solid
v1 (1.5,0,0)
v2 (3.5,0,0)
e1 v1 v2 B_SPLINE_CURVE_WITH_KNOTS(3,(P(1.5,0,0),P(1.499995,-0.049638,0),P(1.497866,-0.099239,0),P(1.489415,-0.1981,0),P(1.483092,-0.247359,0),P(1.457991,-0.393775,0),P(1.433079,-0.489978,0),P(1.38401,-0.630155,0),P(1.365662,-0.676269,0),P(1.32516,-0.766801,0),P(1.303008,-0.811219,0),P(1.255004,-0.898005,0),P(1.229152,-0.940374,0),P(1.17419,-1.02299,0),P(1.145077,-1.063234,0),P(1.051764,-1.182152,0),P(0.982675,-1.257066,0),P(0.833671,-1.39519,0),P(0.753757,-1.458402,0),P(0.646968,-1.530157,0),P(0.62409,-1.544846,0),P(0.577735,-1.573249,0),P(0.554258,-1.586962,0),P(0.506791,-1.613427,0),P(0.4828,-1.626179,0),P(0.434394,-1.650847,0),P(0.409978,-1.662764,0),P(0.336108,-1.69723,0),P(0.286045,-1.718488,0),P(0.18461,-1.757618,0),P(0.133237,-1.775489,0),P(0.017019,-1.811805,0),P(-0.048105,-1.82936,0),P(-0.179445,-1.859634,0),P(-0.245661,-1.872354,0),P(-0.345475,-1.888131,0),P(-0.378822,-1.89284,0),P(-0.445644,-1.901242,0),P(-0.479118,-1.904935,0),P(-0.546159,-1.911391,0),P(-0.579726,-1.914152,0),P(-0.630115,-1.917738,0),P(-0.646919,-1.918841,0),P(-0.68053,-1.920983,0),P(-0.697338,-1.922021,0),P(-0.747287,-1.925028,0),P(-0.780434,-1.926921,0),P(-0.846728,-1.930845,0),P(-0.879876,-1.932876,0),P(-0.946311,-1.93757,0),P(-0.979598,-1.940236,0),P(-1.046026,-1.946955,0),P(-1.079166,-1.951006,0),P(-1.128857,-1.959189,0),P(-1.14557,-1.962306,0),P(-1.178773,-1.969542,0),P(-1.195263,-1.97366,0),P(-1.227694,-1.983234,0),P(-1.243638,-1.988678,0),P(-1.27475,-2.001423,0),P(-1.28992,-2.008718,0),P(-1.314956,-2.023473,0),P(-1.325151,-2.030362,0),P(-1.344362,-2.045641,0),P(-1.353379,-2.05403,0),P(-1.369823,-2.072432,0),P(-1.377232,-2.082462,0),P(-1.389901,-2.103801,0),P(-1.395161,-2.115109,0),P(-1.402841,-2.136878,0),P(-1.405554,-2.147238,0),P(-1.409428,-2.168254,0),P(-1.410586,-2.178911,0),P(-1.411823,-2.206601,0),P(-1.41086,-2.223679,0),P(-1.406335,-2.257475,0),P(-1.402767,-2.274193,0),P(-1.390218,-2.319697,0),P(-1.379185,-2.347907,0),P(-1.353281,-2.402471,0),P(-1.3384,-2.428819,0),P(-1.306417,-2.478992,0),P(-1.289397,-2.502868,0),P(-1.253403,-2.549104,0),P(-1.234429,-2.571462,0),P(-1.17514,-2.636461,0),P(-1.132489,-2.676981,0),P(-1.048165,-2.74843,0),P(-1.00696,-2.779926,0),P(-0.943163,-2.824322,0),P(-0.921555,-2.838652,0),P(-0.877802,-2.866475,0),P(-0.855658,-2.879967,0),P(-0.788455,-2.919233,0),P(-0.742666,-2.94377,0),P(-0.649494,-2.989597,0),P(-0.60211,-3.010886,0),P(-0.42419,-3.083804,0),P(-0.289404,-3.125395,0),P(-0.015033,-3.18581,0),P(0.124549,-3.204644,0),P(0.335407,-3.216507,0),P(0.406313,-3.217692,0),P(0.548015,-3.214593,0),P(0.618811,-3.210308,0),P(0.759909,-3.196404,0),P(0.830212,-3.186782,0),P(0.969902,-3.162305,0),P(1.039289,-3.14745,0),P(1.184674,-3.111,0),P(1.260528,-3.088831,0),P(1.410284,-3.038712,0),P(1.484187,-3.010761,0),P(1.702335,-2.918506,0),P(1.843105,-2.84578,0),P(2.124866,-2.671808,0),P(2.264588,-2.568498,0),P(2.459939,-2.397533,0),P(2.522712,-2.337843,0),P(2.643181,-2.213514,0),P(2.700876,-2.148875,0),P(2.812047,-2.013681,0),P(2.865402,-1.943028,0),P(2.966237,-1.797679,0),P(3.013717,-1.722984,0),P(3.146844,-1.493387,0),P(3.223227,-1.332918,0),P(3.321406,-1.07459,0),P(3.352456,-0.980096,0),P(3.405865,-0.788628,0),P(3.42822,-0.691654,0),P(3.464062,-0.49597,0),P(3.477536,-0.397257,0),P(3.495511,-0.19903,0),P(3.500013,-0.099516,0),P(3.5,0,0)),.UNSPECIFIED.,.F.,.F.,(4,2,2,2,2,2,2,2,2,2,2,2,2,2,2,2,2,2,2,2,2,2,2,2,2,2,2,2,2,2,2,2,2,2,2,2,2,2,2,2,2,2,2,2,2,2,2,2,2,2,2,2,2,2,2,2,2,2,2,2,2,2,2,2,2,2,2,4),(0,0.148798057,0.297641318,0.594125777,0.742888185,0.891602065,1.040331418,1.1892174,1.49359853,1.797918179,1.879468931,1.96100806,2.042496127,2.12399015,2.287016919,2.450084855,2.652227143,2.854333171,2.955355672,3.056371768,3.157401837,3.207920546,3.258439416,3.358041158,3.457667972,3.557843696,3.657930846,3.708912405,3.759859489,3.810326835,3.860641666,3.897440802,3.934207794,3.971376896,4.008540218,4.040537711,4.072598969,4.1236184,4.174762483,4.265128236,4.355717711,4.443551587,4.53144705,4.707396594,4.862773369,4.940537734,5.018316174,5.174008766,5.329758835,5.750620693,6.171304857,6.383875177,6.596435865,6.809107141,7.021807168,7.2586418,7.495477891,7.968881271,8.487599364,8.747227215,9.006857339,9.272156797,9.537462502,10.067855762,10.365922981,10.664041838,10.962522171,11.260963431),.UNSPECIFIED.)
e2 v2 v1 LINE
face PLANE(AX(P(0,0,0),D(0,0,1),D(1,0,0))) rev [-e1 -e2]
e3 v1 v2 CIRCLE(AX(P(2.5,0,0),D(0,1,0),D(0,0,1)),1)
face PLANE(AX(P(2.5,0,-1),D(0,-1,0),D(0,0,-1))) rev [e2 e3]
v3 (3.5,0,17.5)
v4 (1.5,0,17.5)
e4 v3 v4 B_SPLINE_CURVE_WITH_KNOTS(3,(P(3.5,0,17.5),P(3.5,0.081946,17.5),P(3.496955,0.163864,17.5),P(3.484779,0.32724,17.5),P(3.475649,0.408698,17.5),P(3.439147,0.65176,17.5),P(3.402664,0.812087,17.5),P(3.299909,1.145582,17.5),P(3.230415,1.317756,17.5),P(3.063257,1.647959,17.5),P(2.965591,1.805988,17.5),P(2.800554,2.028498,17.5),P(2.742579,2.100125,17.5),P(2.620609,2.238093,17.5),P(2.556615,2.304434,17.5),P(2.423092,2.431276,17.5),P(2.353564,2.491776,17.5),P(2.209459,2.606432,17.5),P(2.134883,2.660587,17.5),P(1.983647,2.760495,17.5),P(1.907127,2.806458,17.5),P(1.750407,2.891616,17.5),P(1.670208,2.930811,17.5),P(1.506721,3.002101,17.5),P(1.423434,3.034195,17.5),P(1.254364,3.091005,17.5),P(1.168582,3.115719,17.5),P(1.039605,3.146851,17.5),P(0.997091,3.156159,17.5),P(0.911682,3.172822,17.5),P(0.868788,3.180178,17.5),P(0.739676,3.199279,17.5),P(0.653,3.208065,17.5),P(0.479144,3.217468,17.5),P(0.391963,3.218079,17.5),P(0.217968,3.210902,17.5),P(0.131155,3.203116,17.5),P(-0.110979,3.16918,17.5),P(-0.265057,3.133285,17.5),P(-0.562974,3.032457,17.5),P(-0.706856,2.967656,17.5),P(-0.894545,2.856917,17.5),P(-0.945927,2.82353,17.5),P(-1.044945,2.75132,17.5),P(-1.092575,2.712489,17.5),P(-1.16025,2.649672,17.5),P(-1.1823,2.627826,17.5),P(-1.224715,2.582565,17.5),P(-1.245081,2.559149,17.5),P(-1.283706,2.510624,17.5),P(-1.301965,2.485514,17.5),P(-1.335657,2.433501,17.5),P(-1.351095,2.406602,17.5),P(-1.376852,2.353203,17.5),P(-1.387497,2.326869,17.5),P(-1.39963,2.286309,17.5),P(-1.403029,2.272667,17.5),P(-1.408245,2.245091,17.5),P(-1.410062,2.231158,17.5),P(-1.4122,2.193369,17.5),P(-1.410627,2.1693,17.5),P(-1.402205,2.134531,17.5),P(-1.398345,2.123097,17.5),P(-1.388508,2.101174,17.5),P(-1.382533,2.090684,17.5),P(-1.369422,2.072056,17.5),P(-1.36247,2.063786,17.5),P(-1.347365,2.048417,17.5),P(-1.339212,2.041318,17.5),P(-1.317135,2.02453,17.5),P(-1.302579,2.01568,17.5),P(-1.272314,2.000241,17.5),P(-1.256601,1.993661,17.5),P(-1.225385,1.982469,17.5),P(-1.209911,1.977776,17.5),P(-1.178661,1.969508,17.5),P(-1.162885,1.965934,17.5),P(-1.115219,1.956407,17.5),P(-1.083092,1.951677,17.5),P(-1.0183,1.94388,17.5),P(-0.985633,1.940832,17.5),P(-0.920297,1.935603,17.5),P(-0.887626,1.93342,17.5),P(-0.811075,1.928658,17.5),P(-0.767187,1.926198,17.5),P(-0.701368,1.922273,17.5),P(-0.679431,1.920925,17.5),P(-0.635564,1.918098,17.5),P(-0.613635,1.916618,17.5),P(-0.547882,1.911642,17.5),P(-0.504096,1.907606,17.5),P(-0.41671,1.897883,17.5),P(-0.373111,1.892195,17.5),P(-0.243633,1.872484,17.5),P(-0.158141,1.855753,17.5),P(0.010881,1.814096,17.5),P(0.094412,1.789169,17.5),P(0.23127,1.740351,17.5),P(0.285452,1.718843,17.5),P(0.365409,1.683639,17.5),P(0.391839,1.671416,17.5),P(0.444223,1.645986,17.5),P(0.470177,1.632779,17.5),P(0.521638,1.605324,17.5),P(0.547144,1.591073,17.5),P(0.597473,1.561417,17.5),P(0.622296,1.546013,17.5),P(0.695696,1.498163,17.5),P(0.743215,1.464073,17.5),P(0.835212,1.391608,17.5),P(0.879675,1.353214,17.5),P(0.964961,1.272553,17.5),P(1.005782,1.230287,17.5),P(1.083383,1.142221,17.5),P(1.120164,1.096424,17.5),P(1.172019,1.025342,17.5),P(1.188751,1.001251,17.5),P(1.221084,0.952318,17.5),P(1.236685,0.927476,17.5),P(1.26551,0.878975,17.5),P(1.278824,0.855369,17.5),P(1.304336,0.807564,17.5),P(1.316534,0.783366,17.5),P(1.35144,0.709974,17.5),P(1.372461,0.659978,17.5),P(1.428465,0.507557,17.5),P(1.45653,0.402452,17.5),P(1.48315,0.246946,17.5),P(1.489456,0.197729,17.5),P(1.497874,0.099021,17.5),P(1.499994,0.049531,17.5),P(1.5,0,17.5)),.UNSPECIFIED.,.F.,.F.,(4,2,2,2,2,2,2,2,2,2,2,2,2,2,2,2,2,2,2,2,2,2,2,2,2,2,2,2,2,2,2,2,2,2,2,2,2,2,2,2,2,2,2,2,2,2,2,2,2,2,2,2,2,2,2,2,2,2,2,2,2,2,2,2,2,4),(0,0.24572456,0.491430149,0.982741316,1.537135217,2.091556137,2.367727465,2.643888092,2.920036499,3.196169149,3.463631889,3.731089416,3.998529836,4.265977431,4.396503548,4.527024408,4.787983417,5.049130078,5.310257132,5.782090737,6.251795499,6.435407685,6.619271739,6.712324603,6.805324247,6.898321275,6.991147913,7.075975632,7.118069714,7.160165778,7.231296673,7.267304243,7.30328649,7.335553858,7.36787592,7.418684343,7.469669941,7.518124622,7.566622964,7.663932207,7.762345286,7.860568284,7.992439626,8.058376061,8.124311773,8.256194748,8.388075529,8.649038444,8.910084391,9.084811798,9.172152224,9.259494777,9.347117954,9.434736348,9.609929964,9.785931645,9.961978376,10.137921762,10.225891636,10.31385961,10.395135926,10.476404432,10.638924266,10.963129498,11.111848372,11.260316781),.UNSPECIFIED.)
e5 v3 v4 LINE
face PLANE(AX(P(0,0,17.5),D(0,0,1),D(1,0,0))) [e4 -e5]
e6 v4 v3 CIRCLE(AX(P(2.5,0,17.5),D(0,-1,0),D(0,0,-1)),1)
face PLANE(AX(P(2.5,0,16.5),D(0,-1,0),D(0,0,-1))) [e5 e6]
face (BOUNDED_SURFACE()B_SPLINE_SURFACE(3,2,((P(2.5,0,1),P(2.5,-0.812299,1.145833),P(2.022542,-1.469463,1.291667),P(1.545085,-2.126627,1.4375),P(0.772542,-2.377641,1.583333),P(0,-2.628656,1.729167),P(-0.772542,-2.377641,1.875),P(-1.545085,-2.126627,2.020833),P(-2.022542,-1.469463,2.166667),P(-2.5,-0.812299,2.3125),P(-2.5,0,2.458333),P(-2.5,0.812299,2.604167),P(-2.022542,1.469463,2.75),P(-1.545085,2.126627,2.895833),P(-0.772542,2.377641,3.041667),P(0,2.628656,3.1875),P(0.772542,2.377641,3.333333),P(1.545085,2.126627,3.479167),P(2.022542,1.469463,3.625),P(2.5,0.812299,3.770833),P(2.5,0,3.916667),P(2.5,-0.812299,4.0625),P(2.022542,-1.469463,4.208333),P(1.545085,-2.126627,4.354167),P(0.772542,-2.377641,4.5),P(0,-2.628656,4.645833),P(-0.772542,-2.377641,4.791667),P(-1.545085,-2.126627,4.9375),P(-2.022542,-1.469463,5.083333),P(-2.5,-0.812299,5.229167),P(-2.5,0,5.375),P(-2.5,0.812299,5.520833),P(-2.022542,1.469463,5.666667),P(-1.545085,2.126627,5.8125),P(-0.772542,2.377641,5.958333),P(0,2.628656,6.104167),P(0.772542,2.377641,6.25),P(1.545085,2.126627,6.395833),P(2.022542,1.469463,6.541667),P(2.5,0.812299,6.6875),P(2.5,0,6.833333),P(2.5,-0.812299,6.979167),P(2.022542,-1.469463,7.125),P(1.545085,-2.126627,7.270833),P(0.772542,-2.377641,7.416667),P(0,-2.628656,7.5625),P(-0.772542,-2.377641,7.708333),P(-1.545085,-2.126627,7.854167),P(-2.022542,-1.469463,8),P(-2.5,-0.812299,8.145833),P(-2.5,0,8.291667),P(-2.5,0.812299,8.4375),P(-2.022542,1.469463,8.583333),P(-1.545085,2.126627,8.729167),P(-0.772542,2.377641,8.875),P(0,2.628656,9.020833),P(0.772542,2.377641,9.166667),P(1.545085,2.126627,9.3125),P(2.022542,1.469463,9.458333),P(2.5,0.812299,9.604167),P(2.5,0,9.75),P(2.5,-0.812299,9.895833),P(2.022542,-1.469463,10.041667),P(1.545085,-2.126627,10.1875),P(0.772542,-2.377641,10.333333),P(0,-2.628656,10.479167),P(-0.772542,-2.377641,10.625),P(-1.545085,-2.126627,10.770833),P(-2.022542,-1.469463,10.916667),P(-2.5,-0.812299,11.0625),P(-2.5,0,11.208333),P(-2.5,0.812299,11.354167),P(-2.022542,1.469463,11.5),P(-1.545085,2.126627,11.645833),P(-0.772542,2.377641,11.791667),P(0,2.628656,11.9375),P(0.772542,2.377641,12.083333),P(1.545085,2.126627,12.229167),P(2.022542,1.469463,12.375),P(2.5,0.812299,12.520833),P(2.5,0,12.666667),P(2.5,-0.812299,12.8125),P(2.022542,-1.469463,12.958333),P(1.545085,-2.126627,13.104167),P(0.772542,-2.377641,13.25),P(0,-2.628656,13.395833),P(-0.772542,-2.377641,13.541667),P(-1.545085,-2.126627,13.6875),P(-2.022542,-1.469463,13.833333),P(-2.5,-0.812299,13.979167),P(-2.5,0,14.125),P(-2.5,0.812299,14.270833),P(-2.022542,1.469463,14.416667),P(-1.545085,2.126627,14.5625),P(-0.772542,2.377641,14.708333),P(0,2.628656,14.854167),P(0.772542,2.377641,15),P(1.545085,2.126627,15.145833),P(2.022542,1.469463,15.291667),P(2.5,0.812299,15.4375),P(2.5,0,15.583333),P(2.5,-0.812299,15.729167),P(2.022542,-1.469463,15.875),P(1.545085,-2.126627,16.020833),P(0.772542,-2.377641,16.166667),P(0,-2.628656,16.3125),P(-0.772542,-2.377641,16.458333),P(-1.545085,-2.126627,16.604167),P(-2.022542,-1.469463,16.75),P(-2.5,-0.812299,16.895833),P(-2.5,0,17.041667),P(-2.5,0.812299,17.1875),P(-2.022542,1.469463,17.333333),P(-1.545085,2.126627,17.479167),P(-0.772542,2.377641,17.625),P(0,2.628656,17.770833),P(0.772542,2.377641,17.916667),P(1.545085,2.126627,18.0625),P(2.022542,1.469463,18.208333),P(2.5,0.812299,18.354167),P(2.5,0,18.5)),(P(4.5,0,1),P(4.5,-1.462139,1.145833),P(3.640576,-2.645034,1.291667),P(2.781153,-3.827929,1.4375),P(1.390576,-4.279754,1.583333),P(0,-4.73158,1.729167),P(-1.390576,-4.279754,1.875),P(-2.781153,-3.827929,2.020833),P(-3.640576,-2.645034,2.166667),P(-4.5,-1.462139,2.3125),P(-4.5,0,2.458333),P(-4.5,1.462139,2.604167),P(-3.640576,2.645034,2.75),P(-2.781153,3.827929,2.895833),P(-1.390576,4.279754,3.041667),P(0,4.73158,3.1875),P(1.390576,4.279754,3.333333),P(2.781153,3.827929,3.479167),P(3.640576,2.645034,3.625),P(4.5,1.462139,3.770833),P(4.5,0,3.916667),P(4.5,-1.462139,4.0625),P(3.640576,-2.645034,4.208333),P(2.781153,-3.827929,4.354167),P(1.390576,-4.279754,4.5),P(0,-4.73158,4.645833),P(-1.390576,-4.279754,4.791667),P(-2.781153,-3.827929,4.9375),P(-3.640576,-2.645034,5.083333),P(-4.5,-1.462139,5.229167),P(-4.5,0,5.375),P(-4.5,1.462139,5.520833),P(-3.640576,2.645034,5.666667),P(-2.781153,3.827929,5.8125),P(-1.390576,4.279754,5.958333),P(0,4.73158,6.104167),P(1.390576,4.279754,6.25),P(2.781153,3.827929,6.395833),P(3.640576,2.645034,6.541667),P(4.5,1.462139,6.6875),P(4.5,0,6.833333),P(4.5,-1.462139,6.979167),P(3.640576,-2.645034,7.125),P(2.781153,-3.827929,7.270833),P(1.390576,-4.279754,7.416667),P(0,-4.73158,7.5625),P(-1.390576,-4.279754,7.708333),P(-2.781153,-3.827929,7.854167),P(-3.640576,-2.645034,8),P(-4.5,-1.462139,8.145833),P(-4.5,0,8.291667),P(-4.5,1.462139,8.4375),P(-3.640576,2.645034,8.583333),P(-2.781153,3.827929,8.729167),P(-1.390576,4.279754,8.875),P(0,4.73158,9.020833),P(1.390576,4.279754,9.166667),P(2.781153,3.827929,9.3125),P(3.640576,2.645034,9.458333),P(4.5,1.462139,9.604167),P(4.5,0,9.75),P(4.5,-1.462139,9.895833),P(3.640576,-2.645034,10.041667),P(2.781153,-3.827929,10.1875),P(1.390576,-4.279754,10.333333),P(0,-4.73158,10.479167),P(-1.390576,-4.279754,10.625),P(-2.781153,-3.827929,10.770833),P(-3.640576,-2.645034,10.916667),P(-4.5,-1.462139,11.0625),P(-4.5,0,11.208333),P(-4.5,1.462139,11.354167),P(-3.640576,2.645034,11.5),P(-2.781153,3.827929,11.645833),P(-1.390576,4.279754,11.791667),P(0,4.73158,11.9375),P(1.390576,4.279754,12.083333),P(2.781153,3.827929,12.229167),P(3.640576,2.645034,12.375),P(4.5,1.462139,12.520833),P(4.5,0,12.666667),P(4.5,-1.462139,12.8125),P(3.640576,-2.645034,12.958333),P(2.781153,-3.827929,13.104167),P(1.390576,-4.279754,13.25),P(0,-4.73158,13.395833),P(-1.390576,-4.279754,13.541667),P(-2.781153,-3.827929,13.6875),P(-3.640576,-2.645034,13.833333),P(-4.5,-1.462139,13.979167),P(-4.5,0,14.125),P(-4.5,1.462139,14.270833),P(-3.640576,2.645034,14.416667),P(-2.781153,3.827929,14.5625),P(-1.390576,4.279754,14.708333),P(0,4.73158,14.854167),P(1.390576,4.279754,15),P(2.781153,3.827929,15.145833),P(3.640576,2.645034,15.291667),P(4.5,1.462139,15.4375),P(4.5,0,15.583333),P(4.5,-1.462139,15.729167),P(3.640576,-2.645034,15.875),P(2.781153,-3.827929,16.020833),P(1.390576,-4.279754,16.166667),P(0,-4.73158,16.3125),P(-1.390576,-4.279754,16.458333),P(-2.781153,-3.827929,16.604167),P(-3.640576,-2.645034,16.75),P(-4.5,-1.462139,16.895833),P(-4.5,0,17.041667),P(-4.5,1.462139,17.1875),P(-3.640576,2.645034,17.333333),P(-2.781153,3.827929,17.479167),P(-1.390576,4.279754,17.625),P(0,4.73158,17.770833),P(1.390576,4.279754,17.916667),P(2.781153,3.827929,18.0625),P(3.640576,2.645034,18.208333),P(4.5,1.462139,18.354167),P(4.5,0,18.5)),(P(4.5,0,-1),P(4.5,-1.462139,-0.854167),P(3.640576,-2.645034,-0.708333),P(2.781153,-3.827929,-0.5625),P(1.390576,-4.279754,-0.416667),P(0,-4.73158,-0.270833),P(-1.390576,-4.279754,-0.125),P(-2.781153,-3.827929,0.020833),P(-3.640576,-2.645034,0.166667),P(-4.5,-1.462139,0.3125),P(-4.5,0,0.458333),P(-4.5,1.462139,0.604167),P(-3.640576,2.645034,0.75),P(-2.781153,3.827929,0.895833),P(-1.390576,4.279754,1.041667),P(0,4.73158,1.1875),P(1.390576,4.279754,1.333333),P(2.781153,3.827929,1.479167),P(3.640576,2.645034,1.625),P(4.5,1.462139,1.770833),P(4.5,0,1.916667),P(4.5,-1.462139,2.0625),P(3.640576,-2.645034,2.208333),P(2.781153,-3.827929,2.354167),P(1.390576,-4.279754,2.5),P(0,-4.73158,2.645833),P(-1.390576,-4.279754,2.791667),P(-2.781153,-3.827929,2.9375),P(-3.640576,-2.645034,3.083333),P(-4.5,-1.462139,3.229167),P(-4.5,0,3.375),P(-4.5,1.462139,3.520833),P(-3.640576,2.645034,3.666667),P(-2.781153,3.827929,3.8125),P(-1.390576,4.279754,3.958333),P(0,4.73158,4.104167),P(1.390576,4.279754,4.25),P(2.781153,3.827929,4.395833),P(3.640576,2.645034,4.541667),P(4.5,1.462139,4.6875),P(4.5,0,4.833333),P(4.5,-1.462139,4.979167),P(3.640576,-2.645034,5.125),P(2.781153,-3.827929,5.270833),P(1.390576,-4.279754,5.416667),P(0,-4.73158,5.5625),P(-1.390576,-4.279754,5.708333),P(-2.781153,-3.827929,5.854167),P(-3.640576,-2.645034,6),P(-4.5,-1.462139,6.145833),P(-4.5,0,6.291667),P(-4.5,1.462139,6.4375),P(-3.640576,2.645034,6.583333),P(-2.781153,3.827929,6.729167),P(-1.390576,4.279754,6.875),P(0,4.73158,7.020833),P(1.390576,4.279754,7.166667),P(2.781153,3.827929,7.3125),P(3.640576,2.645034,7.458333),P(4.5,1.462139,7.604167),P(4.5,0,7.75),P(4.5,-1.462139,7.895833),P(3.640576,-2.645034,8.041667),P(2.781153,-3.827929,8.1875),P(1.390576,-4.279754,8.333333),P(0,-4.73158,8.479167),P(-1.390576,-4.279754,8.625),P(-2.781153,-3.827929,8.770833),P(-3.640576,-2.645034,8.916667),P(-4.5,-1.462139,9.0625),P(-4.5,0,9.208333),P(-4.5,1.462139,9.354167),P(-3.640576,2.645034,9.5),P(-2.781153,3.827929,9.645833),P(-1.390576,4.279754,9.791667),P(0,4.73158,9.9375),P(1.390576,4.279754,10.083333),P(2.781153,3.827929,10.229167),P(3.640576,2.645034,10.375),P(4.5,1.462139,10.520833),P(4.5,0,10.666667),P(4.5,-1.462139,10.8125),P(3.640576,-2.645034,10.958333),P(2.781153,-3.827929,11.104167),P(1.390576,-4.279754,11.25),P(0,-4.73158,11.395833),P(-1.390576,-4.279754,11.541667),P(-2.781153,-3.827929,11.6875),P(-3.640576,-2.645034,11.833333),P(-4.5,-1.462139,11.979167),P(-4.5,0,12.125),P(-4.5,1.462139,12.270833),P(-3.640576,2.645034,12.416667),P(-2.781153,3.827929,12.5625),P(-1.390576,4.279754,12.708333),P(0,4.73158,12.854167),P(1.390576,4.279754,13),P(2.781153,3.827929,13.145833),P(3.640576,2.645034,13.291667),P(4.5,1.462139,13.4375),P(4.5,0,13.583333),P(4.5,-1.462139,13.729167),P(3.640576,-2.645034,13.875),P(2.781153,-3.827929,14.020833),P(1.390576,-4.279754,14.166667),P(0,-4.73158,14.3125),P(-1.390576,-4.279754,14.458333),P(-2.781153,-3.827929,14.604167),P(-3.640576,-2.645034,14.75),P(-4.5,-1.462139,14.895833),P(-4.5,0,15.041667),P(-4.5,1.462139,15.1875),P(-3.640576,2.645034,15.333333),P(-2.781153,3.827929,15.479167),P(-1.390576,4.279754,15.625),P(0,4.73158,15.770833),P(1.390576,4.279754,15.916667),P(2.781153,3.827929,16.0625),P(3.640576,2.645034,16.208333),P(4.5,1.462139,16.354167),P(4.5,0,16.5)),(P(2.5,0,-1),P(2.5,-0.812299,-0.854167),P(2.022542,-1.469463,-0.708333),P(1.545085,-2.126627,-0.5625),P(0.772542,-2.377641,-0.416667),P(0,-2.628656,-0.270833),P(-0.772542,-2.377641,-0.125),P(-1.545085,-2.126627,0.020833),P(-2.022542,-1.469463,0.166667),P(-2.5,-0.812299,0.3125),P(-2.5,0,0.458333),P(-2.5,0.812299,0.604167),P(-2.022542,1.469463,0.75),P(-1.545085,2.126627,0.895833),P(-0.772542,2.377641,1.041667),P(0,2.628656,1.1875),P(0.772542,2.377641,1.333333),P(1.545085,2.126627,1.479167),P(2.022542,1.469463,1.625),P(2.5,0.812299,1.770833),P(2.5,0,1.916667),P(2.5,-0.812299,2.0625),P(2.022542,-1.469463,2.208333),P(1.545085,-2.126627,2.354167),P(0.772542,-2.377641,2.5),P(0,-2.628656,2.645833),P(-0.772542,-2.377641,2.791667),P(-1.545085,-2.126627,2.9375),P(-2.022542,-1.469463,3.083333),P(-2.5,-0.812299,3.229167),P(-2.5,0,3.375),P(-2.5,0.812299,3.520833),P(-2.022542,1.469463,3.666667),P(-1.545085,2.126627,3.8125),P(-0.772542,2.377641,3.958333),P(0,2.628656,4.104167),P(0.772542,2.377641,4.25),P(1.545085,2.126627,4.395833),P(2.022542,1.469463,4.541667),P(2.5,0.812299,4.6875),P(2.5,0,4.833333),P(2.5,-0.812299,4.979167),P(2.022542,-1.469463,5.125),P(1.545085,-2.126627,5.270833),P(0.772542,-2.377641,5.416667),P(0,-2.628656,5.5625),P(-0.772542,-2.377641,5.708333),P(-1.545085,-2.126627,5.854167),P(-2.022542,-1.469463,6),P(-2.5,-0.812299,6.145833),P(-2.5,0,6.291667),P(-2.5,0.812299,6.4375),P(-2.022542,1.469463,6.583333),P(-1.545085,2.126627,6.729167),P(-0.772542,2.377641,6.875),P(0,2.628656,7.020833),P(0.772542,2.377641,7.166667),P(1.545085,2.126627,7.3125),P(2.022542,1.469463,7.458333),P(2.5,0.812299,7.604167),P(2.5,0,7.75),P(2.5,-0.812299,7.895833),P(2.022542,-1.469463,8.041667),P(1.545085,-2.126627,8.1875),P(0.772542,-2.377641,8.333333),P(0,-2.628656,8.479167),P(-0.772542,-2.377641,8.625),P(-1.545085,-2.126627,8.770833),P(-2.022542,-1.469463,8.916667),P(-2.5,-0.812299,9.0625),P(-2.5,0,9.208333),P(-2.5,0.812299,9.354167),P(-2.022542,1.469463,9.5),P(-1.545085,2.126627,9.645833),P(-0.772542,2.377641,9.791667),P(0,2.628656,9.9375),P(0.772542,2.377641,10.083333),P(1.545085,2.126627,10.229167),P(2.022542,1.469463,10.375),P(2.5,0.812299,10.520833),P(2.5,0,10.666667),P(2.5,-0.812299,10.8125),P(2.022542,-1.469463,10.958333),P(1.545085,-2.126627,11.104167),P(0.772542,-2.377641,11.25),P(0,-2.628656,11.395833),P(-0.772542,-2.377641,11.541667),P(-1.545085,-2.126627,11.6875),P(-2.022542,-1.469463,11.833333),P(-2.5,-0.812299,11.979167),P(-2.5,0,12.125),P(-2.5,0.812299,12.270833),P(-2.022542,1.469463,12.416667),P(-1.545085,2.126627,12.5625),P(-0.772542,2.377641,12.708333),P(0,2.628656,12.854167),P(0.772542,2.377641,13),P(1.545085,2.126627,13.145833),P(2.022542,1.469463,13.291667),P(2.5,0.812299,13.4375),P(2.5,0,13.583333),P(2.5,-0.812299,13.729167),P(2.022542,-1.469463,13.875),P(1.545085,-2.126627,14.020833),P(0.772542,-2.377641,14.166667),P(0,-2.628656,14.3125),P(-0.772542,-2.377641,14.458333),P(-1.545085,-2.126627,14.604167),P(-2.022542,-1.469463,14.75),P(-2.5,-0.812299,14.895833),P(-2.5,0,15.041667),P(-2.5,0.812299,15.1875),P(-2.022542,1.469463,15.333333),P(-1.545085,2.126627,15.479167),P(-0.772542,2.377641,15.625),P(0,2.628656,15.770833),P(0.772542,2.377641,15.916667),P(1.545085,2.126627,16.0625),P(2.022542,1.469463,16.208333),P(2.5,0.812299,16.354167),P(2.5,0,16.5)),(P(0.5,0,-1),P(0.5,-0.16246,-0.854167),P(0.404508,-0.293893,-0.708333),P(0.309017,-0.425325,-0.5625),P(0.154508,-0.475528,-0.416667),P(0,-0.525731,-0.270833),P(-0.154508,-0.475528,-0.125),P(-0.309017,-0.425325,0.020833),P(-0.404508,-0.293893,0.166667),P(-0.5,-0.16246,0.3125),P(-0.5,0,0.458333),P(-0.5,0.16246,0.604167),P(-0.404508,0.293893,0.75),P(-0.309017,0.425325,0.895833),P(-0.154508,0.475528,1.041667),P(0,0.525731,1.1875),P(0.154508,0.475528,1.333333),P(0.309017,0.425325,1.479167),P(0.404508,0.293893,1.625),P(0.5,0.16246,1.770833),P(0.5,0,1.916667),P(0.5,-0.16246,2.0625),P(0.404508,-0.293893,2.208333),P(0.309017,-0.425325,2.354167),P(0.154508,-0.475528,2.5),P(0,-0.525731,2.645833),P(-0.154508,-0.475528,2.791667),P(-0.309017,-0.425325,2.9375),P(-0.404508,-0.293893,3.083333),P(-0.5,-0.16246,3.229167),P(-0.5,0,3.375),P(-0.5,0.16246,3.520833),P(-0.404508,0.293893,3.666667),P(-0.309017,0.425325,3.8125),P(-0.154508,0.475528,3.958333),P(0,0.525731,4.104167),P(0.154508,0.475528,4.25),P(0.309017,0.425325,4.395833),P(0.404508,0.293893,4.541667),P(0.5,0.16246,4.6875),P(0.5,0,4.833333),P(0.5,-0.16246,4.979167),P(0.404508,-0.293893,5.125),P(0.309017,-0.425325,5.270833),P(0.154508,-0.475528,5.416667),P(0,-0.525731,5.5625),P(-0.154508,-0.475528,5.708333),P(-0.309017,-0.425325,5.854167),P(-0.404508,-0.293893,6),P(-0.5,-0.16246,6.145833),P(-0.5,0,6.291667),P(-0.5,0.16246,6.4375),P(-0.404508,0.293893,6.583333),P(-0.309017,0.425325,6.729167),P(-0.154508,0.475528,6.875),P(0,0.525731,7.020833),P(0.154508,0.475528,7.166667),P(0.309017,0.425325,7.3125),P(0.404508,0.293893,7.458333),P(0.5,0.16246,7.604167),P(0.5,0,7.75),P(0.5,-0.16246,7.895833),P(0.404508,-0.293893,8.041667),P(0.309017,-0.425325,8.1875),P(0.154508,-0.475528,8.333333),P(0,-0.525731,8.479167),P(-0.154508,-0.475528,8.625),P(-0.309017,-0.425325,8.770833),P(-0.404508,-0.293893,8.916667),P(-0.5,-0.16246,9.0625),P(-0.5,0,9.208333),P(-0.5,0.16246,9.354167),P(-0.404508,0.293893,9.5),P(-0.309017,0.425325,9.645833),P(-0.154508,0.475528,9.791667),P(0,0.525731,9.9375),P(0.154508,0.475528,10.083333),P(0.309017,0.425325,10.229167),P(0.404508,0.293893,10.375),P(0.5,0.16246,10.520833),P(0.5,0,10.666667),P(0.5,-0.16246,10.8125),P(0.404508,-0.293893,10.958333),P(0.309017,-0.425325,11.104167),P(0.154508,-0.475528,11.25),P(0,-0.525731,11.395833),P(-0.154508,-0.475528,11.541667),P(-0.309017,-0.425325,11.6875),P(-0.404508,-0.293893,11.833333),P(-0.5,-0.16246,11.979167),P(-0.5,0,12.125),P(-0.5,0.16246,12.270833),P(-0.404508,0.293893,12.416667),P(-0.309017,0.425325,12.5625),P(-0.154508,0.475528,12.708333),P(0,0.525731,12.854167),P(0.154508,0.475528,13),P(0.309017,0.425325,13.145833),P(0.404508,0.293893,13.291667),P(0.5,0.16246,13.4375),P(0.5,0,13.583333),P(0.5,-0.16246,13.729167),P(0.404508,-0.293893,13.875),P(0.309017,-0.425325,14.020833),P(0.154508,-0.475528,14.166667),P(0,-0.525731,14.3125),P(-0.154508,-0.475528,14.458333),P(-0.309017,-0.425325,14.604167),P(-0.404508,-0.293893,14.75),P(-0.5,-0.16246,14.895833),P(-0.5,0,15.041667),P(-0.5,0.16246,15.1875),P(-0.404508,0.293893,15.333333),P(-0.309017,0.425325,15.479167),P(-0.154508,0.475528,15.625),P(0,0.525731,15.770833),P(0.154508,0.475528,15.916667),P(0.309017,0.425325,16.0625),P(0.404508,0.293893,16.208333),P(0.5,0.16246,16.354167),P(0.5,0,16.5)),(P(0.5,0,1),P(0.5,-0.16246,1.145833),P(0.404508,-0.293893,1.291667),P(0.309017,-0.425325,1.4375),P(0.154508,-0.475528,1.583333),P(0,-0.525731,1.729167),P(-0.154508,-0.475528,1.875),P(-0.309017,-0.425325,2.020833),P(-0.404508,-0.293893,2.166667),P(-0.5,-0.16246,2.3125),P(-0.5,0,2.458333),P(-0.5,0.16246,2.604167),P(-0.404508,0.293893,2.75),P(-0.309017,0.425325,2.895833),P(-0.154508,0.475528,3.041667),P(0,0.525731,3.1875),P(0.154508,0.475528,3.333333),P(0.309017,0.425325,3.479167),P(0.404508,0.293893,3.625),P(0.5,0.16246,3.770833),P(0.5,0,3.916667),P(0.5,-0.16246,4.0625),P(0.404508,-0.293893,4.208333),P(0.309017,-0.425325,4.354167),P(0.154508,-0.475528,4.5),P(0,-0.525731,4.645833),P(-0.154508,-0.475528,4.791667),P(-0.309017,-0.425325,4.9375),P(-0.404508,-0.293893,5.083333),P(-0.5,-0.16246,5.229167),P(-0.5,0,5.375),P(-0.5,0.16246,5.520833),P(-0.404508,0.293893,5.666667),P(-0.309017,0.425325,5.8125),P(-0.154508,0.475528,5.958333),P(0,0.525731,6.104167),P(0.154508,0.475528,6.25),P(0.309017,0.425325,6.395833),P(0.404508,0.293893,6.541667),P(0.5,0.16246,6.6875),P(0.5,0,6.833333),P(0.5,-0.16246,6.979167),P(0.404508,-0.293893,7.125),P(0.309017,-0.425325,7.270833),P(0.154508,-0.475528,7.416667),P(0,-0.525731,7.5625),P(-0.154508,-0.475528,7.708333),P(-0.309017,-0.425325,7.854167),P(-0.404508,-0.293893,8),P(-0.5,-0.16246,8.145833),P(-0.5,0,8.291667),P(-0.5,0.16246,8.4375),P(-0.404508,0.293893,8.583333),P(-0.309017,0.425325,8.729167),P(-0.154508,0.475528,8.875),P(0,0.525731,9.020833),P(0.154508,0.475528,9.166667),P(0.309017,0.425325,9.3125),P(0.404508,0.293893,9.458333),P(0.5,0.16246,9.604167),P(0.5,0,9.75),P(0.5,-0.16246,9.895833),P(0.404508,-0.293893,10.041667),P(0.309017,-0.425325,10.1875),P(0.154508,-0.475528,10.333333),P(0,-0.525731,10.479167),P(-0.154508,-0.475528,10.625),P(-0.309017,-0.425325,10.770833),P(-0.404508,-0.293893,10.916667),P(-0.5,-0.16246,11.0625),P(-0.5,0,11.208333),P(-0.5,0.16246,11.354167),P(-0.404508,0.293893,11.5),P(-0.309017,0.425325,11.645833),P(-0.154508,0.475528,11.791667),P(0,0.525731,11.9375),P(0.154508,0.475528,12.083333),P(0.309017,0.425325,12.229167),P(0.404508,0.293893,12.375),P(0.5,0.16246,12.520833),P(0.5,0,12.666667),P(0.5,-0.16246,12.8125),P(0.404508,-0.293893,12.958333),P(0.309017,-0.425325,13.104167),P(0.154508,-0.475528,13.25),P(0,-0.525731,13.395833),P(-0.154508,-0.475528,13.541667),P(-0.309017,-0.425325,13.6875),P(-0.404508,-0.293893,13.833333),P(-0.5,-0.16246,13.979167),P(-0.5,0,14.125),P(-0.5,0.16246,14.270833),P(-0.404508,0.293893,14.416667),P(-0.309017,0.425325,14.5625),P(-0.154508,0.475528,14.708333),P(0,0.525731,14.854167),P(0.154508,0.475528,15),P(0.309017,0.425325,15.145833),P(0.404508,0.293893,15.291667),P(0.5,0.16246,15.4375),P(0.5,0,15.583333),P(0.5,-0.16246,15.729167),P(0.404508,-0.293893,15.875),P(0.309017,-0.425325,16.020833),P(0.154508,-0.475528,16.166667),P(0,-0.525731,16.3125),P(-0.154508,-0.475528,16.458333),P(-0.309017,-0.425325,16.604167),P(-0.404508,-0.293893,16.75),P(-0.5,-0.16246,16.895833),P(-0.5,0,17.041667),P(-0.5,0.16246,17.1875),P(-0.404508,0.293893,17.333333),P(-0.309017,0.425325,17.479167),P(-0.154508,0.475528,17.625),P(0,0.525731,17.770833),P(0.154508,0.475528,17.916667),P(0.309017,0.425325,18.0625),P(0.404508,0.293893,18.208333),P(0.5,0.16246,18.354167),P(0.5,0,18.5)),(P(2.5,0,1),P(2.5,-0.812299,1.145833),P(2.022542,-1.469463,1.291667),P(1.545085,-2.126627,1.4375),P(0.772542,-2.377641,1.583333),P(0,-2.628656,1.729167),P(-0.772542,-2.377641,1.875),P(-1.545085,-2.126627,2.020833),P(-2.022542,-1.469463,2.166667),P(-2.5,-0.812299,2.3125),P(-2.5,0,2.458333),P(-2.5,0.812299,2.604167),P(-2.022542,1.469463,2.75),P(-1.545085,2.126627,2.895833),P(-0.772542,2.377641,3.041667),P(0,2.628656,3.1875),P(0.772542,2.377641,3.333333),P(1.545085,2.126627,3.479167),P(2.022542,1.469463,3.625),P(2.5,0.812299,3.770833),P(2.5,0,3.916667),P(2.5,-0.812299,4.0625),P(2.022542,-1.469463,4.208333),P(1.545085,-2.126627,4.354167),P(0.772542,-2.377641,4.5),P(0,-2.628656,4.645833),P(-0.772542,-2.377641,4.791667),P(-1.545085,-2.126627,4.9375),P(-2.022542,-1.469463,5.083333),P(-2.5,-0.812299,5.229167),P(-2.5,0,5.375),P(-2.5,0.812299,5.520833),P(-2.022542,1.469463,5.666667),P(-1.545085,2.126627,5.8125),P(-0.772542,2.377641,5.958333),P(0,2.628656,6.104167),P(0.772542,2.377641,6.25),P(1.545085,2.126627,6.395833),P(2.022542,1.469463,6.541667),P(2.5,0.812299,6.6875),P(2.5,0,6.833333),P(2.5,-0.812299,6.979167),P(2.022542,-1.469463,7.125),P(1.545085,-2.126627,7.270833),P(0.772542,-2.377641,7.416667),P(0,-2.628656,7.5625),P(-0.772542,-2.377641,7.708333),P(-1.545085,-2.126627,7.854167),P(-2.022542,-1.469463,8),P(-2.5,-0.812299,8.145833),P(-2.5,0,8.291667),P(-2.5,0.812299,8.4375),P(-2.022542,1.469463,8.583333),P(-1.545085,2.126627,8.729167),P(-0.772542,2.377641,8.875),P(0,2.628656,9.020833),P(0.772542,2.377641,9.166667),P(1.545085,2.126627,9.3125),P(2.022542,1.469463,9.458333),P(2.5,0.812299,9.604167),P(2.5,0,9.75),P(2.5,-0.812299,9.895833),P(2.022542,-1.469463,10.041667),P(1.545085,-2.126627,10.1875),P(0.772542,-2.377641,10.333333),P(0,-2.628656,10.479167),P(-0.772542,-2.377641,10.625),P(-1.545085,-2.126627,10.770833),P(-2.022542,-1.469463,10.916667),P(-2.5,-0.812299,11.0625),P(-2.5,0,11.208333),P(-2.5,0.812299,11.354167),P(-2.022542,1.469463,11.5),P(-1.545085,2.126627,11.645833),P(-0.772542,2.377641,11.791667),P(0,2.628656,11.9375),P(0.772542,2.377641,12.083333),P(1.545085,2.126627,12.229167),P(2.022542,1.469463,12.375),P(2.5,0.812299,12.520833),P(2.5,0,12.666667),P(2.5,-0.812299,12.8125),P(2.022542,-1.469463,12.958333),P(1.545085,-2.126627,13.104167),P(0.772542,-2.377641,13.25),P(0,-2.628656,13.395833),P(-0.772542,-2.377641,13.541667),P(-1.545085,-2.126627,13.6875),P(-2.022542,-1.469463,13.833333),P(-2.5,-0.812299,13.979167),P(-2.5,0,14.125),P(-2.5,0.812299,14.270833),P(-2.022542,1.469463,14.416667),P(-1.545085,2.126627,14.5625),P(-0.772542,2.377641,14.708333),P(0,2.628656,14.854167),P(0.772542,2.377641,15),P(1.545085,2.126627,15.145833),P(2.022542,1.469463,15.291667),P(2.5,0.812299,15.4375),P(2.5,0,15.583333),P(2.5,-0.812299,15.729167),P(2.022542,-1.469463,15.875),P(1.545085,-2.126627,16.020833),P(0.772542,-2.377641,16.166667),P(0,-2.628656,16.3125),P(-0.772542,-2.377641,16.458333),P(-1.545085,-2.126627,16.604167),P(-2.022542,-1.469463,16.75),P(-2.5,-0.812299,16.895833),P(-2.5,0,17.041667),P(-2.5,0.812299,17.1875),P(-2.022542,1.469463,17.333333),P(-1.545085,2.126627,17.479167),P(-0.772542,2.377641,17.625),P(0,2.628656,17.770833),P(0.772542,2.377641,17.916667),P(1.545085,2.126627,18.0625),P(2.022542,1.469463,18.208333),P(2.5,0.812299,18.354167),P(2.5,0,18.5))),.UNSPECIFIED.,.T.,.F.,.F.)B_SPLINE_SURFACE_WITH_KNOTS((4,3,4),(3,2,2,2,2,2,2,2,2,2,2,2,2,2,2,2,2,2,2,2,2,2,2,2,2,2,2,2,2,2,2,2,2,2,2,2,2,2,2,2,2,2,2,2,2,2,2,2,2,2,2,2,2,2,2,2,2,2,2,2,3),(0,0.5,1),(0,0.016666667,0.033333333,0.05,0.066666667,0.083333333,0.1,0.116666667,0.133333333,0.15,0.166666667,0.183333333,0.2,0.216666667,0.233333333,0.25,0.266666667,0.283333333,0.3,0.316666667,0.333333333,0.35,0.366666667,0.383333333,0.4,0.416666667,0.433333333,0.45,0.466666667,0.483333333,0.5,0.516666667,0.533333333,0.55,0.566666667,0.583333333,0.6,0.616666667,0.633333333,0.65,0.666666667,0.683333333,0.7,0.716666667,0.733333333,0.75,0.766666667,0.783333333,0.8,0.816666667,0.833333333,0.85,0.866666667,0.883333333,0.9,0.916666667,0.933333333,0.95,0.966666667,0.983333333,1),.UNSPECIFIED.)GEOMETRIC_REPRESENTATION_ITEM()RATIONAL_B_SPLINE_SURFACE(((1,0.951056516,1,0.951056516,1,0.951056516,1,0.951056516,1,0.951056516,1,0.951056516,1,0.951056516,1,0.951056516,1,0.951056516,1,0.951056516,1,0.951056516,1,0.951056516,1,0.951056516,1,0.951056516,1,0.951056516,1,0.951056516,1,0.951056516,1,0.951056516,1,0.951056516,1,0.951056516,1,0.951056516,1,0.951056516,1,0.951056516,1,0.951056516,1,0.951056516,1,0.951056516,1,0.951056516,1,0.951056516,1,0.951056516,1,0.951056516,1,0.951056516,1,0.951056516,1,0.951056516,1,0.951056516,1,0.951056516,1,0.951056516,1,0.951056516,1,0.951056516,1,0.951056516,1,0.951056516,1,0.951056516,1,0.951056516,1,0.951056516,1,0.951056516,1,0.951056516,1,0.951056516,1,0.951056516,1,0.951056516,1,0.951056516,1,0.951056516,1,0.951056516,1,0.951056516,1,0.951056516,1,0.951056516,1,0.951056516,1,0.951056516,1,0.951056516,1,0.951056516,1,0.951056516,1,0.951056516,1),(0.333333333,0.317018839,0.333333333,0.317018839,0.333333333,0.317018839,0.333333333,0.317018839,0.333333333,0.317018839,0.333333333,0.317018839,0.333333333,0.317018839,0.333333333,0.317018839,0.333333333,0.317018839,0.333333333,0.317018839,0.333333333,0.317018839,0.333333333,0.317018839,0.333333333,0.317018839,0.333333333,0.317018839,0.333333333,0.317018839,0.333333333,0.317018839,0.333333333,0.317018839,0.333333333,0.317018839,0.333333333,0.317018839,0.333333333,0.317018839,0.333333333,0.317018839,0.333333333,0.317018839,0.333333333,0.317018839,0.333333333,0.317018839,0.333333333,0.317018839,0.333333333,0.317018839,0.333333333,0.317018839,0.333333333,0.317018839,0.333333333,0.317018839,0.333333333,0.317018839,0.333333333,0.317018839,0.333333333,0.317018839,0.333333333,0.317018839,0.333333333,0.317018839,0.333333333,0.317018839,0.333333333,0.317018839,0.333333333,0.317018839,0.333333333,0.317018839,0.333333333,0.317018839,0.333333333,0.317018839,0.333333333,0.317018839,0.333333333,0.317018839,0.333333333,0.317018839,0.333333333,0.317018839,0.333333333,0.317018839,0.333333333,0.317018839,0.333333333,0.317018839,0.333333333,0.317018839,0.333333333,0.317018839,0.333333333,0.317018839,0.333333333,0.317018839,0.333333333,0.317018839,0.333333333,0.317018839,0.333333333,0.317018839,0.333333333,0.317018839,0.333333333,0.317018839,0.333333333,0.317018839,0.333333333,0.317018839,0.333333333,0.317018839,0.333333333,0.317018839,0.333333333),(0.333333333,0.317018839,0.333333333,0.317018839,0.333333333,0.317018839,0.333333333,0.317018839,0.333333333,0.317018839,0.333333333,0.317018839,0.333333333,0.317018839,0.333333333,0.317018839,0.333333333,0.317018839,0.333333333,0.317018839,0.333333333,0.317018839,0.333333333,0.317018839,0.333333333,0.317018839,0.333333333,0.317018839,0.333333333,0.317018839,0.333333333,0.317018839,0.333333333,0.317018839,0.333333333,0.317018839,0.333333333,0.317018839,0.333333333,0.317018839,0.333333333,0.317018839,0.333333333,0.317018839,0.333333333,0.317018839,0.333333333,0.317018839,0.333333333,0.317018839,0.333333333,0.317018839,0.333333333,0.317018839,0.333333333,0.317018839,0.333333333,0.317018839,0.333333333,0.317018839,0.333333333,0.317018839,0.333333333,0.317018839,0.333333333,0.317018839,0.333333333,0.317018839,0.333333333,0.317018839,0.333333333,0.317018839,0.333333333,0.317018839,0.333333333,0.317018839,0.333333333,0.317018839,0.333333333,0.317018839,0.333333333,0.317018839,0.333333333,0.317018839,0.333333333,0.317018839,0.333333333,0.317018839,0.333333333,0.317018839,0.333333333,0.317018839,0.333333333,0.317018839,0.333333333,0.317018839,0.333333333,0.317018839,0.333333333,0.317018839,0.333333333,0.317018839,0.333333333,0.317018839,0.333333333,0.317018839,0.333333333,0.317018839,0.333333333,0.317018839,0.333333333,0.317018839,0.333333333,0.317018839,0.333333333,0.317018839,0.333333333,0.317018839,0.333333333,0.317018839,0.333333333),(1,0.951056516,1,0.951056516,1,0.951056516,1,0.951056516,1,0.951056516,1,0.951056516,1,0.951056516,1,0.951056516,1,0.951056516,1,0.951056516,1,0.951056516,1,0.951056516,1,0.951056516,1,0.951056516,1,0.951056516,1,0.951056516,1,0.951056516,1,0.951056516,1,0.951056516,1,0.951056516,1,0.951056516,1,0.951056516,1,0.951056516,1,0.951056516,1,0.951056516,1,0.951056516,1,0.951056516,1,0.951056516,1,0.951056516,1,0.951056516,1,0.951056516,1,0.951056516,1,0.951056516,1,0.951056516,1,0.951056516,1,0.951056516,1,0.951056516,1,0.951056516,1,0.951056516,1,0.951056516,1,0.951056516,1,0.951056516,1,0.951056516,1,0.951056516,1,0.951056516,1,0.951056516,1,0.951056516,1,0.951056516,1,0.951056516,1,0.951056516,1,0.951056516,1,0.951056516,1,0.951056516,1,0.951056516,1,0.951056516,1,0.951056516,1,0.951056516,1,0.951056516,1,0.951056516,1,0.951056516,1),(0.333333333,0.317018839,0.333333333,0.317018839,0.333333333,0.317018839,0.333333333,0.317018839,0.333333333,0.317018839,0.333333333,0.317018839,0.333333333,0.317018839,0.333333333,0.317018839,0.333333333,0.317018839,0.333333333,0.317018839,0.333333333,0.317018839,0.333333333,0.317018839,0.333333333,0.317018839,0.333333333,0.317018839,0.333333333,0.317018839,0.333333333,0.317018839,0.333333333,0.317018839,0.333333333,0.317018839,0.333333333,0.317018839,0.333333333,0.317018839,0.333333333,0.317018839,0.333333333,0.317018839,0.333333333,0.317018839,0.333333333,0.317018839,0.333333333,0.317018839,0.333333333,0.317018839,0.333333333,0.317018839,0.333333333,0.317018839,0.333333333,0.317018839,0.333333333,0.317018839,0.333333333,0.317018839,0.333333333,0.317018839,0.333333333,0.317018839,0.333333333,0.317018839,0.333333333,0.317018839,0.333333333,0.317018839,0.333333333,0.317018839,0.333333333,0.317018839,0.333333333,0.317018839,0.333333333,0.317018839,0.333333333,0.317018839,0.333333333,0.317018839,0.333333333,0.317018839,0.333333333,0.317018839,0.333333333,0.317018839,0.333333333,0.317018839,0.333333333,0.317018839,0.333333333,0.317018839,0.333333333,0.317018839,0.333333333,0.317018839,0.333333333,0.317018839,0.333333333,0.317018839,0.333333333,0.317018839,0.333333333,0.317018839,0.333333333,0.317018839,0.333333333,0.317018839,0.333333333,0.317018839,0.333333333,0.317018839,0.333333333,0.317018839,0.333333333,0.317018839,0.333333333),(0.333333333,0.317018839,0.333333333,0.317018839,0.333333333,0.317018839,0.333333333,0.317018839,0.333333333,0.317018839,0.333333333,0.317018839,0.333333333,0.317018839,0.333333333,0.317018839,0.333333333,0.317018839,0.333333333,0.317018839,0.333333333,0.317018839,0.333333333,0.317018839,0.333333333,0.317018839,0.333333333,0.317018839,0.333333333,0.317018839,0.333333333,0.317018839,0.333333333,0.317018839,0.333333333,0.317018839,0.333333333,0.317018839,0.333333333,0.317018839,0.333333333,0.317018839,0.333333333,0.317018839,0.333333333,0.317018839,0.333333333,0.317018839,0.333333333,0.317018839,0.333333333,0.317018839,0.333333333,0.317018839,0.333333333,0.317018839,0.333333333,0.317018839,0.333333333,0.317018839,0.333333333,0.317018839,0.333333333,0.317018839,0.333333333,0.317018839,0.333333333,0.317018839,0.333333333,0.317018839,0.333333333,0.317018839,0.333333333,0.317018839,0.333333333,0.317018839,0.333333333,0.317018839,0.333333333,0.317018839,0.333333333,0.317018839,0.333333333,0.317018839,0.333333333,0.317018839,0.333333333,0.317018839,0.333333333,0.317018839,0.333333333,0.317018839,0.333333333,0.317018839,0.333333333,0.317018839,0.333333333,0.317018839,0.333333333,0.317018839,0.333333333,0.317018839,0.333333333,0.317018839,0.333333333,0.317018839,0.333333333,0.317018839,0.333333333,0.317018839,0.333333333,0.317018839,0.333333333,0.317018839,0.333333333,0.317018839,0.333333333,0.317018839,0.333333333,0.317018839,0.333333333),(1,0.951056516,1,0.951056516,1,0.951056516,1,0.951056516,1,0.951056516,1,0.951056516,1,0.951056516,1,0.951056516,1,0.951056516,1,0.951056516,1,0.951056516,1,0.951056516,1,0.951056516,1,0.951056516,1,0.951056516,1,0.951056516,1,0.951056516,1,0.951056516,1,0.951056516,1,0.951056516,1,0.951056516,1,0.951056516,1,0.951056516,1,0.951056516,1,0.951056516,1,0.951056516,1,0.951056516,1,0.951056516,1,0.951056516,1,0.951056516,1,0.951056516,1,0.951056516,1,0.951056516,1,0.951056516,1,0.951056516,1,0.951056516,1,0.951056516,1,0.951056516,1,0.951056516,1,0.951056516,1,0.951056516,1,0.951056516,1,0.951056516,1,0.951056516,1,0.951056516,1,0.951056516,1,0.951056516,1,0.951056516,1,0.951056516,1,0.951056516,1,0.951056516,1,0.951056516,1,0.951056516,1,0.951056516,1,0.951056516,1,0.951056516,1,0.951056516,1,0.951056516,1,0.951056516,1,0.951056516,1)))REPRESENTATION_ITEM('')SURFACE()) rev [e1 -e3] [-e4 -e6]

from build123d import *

# Parameters (mm, degrees)
WYCI_GNI_CIE_PO_CIE_CE1_PITCH  = 2.916666667
WYCI_GNI_CIE_PO_CIE_CE1_HEIGHT = 17.5
WYCI_GNI_CIE_PO_CIE_CE1_RADIUS = 2.5
SZKIC2_R                       = 1


with BuildPart() as part:
    # Wyciągnięcie po ścieżce1: sweep along a helix
    with BuildLine() as wyci_gni_cie_po_cie_ce1_path:
        Helix(WYCI_GNI_CIE_PO_CIE_CE1_PITCH, WYCI_GNI_CIE_PO_CIE_CE1_HEIGHT, WYCI_GNI_CIE_PO_CIE_CE1_RADIUS, center=(0, 0, 0), direction=(0, 0, 1), lefthand=True)
    # Szkic2 → Wyciągnięcie po ścieżce1 (sweep)
    with BuildSketch(Plane(origin=(0, 0, 0), x_dir=(1, 0, 0), z_dir=(0, 1, 0))):
        with Locations((2.5, 0)):
            Circle(SZKIC2_R)
    sweep(path=wyci_gni_cie_po_cie_ce1_path.line, is_frenet=True)

    # Cięcie powierzchnią1
    split(bisect_by=Plane.XY, keep=Keep.TOP)

    # Cięcie powierzchnią2
    split(bisect_by=Plane.XY.offset(17.5), keep=Keep.BOTTOM)


solid = part.part
